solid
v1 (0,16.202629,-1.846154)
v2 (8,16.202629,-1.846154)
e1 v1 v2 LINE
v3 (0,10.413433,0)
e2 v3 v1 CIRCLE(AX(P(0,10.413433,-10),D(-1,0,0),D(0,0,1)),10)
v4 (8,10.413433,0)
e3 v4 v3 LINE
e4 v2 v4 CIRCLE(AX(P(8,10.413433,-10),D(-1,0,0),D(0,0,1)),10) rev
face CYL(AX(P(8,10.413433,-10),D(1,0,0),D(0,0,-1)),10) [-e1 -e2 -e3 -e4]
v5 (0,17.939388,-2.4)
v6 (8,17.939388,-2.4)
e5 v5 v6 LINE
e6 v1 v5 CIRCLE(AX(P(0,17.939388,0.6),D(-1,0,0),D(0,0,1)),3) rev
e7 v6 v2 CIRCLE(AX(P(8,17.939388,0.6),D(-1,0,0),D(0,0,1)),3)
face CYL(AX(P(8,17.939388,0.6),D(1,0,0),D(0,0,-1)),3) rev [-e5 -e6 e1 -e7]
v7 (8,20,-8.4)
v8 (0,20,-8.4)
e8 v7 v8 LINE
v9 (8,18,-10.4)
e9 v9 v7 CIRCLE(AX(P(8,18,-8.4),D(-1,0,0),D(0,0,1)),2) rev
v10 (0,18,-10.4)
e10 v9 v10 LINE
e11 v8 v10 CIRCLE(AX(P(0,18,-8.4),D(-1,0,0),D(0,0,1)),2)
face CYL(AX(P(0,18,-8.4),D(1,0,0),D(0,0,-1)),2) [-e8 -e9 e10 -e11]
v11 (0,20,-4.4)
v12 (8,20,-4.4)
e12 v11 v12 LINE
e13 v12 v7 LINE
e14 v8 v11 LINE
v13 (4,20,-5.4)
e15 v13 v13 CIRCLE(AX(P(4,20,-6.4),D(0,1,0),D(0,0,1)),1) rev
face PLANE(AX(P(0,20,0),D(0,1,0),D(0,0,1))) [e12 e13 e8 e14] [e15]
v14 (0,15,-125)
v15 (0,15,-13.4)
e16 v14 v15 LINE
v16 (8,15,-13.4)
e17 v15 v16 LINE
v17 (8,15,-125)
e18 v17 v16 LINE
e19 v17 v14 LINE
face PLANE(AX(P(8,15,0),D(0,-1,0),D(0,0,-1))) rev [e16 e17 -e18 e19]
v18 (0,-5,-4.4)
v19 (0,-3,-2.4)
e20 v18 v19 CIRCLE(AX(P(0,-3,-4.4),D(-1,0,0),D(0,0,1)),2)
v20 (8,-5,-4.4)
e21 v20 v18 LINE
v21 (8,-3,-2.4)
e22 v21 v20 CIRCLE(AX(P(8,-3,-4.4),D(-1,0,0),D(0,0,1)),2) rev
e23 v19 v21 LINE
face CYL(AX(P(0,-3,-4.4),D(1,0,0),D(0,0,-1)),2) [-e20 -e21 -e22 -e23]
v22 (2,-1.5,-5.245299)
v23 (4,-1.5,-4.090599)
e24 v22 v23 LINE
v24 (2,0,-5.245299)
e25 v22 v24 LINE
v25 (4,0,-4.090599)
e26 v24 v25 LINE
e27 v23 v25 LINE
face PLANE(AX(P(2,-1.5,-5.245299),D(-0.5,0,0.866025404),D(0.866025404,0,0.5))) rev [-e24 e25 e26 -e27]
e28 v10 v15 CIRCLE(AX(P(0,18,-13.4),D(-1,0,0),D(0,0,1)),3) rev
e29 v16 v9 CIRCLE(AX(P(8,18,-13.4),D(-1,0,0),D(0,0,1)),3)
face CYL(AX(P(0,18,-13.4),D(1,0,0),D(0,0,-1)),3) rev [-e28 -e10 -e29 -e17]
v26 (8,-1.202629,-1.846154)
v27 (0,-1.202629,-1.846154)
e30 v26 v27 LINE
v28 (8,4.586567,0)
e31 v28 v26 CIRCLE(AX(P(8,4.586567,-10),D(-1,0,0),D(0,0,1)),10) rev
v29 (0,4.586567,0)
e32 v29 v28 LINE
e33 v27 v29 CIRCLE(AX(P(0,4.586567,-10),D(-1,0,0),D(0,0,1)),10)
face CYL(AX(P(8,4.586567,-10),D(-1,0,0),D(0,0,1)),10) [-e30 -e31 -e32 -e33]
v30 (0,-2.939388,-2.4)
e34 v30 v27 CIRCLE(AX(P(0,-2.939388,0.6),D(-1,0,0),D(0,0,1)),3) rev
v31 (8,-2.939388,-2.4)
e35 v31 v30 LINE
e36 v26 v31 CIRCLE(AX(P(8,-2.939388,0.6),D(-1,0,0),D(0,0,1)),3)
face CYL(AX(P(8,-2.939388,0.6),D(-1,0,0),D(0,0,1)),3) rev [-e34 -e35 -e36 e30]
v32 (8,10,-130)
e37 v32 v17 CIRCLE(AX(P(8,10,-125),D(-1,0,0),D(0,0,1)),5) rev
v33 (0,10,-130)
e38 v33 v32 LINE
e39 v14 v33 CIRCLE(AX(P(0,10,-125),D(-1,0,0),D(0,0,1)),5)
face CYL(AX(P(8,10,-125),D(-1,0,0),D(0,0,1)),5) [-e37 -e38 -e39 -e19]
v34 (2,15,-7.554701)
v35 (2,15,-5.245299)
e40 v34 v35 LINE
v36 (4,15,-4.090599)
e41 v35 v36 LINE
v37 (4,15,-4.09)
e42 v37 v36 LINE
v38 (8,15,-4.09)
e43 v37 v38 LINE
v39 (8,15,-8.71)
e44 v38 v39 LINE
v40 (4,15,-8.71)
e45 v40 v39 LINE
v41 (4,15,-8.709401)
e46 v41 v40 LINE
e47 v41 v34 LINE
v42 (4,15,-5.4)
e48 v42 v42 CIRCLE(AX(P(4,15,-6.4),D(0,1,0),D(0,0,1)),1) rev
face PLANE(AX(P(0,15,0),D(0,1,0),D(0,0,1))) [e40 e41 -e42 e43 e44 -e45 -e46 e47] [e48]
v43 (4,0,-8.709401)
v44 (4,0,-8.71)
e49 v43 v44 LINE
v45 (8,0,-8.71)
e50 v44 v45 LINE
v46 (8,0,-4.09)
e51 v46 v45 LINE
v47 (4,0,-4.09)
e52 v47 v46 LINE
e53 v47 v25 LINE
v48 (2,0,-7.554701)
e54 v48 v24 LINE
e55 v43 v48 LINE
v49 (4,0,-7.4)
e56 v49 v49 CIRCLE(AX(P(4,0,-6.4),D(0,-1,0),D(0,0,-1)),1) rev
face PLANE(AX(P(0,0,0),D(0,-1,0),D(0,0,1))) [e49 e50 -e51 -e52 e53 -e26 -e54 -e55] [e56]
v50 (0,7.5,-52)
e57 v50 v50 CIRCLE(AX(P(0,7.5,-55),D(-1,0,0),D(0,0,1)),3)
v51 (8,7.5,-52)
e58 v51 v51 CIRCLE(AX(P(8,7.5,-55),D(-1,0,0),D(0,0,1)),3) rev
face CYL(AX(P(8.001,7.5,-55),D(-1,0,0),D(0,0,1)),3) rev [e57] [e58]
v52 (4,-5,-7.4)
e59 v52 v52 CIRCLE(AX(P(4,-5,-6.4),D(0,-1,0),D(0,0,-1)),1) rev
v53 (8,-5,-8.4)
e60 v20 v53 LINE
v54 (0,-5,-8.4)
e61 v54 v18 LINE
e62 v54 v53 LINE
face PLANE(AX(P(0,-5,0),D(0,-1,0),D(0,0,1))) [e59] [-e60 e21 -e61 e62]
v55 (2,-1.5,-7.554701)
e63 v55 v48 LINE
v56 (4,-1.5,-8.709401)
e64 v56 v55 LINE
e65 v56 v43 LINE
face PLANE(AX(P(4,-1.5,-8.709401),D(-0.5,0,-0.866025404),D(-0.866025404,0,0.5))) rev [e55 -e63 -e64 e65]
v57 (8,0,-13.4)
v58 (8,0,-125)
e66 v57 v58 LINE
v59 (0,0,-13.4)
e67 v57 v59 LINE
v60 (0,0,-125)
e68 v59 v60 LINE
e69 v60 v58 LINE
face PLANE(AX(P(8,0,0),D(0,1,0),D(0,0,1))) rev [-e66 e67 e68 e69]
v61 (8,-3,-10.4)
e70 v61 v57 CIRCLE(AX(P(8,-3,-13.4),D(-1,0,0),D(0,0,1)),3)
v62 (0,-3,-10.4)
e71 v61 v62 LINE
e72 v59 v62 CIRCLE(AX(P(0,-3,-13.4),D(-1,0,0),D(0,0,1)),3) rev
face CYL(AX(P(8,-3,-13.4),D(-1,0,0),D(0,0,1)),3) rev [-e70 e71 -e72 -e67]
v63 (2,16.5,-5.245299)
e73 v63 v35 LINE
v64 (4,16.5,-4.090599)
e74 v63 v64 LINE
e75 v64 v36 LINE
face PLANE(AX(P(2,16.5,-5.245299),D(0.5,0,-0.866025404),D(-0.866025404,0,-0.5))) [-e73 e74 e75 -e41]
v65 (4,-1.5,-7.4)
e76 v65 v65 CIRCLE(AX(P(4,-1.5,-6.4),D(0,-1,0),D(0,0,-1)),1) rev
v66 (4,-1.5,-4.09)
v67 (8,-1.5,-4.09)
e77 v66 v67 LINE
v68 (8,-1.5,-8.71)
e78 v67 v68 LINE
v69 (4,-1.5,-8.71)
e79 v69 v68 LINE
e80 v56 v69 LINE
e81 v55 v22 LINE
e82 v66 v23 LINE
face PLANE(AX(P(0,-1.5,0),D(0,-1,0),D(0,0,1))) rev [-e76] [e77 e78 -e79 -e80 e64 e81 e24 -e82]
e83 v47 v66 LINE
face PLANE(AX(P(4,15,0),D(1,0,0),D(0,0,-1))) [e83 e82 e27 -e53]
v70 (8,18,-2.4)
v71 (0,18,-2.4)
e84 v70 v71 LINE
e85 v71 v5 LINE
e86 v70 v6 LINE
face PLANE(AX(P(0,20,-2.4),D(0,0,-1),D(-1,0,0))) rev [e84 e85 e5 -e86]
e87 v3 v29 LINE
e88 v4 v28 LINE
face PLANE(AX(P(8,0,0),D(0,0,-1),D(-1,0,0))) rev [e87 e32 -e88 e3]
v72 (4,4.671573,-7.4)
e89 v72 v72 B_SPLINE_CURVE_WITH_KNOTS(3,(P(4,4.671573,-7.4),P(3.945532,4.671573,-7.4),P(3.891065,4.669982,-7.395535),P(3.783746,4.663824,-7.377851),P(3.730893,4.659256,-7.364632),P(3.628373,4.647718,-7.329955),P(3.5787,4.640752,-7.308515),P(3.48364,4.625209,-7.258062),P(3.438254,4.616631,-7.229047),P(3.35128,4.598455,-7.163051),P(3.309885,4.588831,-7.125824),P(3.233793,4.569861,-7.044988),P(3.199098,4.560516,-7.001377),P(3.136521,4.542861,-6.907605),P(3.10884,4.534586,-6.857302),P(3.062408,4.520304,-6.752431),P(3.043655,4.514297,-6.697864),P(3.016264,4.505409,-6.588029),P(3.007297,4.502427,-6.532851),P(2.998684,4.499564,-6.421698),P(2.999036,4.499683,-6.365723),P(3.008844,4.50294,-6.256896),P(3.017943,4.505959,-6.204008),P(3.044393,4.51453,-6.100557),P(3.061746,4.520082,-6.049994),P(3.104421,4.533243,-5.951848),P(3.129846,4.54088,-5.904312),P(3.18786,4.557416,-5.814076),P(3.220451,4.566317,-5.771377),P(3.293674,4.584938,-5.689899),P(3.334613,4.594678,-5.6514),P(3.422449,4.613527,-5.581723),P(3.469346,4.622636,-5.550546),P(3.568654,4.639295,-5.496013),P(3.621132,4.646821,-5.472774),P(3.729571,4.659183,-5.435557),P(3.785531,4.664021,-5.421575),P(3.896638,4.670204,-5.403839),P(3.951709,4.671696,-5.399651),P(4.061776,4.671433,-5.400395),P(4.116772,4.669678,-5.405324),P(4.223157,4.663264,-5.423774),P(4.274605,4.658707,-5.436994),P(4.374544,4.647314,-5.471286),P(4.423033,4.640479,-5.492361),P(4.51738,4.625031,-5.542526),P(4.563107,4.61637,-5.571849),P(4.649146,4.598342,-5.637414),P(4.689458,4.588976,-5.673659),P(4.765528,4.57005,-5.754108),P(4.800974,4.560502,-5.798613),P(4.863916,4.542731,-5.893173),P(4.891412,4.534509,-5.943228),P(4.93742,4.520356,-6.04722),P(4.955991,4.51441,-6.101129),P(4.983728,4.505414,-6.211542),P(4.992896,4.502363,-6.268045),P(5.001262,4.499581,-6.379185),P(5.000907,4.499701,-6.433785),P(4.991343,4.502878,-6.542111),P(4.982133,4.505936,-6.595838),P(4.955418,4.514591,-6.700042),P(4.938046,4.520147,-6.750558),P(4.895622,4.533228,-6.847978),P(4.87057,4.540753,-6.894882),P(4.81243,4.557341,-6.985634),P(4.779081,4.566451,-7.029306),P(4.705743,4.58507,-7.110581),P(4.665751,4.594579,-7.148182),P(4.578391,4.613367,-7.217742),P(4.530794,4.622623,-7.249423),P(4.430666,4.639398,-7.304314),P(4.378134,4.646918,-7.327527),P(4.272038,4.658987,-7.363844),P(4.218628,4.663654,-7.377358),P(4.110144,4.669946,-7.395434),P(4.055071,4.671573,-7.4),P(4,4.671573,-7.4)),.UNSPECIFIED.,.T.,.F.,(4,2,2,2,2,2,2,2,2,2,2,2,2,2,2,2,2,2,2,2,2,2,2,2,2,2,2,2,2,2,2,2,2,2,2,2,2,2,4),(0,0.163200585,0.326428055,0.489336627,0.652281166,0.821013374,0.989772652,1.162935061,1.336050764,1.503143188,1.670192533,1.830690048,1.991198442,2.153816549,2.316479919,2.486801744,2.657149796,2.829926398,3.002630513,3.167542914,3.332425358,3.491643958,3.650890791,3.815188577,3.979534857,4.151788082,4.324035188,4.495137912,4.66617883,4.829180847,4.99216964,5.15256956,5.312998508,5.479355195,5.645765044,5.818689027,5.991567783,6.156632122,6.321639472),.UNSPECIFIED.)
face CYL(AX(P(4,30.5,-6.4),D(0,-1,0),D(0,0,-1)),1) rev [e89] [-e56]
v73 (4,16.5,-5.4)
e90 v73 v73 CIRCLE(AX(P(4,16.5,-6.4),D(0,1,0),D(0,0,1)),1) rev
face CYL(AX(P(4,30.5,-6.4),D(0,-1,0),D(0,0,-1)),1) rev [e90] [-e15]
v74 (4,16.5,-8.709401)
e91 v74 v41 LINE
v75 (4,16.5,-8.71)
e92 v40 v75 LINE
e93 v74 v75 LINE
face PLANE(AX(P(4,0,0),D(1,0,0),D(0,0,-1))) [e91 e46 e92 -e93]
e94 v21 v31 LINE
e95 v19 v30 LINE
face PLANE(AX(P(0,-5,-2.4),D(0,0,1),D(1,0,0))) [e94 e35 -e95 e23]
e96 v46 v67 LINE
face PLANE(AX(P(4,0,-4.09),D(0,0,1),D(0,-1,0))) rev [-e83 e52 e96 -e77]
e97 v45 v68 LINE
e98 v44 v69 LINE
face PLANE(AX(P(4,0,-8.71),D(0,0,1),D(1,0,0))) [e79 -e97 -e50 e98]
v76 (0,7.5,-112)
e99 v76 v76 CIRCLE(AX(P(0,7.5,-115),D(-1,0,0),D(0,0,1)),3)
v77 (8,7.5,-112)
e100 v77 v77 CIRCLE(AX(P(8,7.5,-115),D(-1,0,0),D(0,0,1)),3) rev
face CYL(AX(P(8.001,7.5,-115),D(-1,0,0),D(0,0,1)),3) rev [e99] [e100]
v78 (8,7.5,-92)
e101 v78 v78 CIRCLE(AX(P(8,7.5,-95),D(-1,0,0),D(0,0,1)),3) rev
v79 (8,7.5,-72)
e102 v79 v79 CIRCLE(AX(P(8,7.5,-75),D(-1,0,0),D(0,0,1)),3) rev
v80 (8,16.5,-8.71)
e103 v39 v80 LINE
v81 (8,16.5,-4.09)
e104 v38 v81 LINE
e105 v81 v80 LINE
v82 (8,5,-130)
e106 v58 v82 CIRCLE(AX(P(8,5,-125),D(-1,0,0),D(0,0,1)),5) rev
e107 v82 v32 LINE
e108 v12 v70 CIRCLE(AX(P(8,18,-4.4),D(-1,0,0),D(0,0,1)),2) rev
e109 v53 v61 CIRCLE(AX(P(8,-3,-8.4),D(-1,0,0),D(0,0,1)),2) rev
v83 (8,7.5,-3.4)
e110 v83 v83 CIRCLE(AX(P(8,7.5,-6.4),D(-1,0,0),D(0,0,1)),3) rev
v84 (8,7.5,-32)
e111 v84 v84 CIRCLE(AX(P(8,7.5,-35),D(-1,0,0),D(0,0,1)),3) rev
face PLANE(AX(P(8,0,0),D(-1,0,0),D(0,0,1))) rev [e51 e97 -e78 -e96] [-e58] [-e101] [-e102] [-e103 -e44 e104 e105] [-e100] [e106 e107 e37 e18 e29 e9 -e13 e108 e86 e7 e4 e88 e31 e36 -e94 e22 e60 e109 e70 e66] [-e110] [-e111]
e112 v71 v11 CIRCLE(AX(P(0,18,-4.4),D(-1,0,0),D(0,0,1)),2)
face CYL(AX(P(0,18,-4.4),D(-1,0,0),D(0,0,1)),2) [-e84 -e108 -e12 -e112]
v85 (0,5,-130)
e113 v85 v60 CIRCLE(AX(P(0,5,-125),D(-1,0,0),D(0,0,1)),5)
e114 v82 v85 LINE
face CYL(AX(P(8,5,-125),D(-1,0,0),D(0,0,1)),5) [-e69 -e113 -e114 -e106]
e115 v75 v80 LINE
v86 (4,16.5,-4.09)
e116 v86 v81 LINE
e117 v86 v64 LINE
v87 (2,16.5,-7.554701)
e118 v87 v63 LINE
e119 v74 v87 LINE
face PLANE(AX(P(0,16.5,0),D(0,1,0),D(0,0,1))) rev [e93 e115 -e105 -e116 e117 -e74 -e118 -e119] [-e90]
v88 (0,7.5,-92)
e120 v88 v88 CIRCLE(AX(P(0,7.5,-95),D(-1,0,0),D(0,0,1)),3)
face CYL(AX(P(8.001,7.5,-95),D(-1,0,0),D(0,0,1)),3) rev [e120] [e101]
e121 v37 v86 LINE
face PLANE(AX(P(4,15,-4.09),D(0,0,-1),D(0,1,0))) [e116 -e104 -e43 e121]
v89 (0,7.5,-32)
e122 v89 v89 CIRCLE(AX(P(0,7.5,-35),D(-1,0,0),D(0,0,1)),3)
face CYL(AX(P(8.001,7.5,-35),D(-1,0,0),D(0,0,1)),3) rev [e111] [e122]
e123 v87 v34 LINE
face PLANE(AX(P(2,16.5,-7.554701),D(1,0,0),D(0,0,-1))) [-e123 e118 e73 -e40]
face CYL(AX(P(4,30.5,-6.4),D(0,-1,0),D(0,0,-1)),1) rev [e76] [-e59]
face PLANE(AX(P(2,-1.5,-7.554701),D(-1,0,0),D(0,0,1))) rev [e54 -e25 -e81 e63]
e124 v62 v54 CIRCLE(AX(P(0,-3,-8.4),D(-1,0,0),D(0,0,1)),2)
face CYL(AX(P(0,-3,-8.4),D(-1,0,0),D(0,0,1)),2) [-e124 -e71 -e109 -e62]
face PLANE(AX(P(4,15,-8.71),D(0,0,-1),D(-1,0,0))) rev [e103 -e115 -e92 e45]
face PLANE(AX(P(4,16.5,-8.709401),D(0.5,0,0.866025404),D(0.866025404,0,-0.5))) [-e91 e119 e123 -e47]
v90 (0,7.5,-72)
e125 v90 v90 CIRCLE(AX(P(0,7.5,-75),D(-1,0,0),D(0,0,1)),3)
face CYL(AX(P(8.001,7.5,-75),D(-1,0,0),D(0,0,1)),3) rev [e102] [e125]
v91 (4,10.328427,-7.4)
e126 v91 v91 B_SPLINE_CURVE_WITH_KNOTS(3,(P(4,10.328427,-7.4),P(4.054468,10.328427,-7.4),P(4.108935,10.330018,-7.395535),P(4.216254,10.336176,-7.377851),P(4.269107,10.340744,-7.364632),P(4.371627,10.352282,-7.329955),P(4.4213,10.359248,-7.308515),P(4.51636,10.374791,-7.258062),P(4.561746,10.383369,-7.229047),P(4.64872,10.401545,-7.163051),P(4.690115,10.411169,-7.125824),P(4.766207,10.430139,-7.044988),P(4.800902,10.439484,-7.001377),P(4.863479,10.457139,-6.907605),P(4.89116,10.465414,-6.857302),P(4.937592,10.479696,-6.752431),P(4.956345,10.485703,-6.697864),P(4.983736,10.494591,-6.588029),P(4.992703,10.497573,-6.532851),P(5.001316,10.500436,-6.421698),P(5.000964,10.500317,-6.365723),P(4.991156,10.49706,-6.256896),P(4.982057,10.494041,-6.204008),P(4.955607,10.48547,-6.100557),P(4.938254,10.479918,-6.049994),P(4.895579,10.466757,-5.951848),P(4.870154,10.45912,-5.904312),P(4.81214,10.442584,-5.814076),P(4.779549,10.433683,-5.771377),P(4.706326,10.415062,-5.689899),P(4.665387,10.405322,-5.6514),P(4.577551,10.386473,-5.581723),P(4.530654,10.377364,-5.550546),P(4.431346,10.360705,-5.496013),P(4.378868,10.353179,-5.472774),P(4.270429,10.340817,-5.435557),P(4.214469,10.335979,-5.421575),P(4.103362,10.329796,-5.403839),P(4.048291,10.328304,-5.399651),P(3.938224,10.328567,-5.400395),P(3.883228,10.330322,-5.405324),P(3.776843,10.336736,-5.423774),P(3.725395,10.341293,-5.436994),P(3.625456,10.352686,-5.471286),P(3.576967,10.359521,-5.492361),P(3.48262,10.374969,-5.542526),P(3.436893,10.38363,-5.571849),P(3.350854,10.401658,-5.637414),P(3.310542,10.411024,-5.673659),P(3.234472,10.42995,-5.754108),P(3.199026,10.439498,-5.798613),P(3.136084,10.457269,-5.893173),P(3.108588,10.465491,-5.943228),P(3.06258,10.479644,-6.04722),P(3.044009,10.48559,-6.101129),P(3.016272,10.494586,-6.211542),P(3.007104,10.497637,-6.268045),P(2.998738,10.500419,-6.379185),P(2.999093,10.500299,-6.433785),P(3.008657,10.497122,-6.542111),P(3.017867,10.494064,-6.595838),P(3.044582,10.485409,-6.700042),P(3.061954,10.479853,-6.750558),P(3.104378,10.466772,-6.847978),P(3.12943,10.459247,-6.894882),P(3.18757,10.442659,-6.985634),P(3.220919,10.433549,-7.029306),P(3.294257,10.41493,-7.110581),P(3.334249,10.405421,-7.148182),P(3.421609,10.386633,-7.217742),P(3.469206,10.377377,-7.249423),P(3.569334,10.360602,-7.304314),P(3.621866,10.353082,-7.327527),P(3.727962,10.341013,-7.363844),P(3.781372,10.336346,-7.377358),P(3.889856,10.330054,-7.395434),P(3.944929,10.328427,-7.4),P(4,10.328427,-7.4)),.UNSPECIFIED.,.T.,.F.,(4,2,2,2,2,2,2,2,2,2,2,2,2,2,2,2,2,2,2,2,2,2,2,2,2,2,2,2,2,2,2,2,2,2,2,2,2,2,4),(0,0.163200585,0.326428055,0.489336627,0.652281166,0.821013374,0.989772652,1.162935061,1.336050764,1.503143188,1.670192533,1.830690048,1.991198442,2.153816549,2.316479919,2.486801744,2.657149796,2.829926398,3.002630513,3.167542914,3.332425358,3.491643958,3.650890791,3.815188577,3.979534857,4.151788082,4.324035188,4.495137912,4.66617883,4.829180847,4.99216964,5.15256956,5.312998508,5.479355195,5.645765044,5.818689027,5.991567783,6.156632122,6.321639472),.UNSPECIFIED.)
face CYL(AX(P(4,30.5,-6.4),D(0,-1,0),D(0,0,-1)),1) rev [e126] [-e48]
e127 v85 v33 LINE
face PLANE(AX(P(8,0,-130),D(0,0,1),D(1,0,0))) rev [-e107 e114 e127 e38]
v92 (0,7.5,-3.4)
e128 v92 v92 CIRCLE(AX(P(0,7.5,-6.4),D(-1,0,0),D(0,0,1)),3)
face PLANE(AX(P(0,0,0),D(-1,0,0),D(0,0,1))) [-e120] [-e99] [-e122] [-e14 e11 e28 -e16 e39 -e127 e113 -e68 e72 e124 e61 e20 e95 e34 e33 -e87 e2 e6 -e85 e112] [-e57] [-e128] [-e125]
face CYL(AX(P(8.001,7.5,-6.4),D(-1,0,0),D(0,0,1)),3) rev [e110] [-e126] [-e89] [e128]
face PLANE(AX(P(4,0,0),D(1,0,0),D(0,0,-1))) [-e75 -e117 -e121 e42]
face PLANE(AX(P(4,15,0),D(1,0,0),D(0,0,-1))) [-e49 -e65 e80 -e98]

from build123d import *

# Parameters (mm, degrees)
SKETCH_1_W                = 130
SKETCH_1_H                = 15
EXTRUDE_1_DEPTH           = 8
CUT_EXTRUDE_10_REACH      = 133.107
SKETCH_17_R               = 3
CUT_EXTRUDE_12_REACH      = 133.107
SKETCH_15_R               = 3
SKETCH_22_W               = 8
SKETCH_22_H               = 8
EXTRUDE_7_DEPTH           = 5
CUT_EXTRUDE_18_DEPTH      = 1.5
SKETCH_25_W               = 4.62
SKETCH_25_H               = 1.5
CUT_EXTRUDE_19_DEPTH      = 4
FILLET_8_R                = 3
FILLET_9_R                = 2
FILLET_10_R               = 2
FILLET_11_R               = 3
CUT_EXTRUDE_20_DEPTH      = 15.5
CUT_EXTRUDE_20_DEPTH_BACK = 28.5
SKETCH_21_R               = 1
FILLET_12_R               = 10
FILLET_13_R               = 5


# Some blends are built 0.0001 mm under size
with BuildPart() as part:
    # 草图1 → 凸台-拉伸1 (new body)
    with BuildSketch(Plane(origin=(0, 0, 0), x_dir=(0, 0, -1), z_dir=(1, 0, 0))):
        with Locations((65, 7.5)):
            Rectangle(SKETCH_1_W, SKETCH_1_H)
    extrude(amount=EXTRUDE_1_DEPTH)

    # 草图17 → 切除-拉伸10 (cut, up to next)
    with BuildSketch(Plane.ZY, mode=Mode.PRIVATE) as cut_extrude_10_sk1:
        with Locations((-115, 7.5)):
            Circle(SKETCH_17_R)
    cut_extrude_10_tool1 = extrude(cut_extrude_10_sk1.sketch, amount=-CUT_EXTRUDE_10_REACH, mode=Mode.PRIVATE) & part.part
    # 草图17 → 切除-拉伸10 (cut, up to next)
    with BuildSketch(Plane.ZY, mode=Mode.PRIVATE) as cut_extrude_10_sk2:
        with Locations((-95, 7.5)):
            Circle(SKETCH_17_R)
    cut_extrude_10_tool2 = extrude(cut_extrude_10_sk2.sketch, amount=-CUT_EXTRUDE_10_REACH, mode=Mode.PRIVATE) & part.part
    # 草图17 → 切除-拉伸10 (cut, up to next)
    with BuildSketch(Plane.ZY, mode=Mode.PRIVATE) as cut_extrude_10_sk3:
        with Locations((-75, 7.5)):
            Circle(SKETCH_17_R)
    cut_extrude_10_tool3 = extrude(cut_extrude_10_sk3.sketch, amount=-CUT_EXTRUDE_10_REACH, mode=Mode.PRIVATE) & part.part
    # 草图17 → 切除-拉伸10 (cut, up to next)
    with BuildSketch(Plane.ZY, mode=Mode.PRIVATE) as cut_extrude_10_sk4:
        with Locations((-55, 7.5)):
            Circle(SKETCH_17_R)
    cut_extrude_10_tool4 = extrude(cut_extrude_10_sk4.sketch, amount=-CUT_EXTRUDE_10_REACH, mode=Mode.PRIVATE) & part.part
    # 草图17 → 切除-拉伸10 (cut, up to next)
    with BuildSketch(Plane.ZY, mode=Mode.PRIVATE) as cut_extrude_10_sk5:
        with Locations((-35, 7.5)):
            Circle(SKETCH_17_R)
    cut_extrude_10_tool5 = extrude(cut_extrude_10_sk5.sketch, amount=-CUT_EXTRUDE_10_REACH, mode=Mode.PRIVATE) & part.part
    add(cut_extrude_10_tool1.solids().sort_by_distance((0, 7.5, -115))[0], mode=Mode.SUBTRACT)
    add(cut_extrude_10_tool2.solids().sort_by_distance((0, 7.5, -95))[0], mode=Mode.SUBTRACT)
    add(cut_extrude_10_tool3.solids().sort_by_distance((0, 7.5, -75))[0], mode=Mode.SUBTRACT)
    add(cut_extrude_10_tool4.solids().sort_by_distance((0, 7.5, -55))[0], mode=Mode.SUBTRACT)
    add(cut_extrude_10_tool5.solids().sort_by_distance((0, 7.5, -35))[0], mode=Mode.SUBTRACT)

    # 草图15 → 切除-拉伸12 (cut, up to next)
    with BuildSketch(Plane.ZY, mode=Mode.PRIVATE) as cut_extrude_12_sk1:
        with Locations((-6.4, 7.5)):
            Circle(SKETCH_15_R)
    cut_extrude_12_tool1 = extrude(cut_extrude_12_sk1.sketch, amount=-CUT_EXTRUDE_12_REACH, mode=Mode.PRIVATE) & part.part
    add(cut_extrude_12_tool1.solids().sort_by_distance((0, 7.5, -6.4))[0], mode=Mode.SUBTRACT)

    # 草图22 → 凸台-拉伸7 (add)
    with BuildSketch(Plane(origin=(0, 15, 0), x_dir=(1, 0, 0), z_dir=(0, 1, 0))):
        with Locations((4, 6.4)):
            Rectangle(SKETCH_22_W, SKETCH_22_H)
    extrude_7 = extrude(amount=EXTRUDE_7_DEPTH)

    # 草图24 → 切除-拉伸18 (cut)
    with BuildSketch(Plane(origin=(0, 15, 0), x_dir=(1, 0, 0), z_dir=(0, 1, 0))):
        Polygon((4, 4.090598923), (6, 5.245299462), (6, 7.554700538), (4, 8.709401077), (2, 7.554700538), (2, 5.245299462), align=None)
    cut_extrude_18 = extrude(amount=CUT_EXTRUDE_18_DEPTH, mode=Mode.SUBTRACT)

    # 草图25 → 切除-拉伸19 (cut)
    with BuildSketch(Plane(origin=(8, 0, 0), x_dir=(0, 0, -1), z_dir=(1, 0, 0))):
        with Locations((6.4, 15.75)):
            Rectangle(SKETCH_25_W, SKETCH_25_H)
    cut_extrude_19 = extrude(amount=-CUT_EXTRUDE_19_DEPTH, mode=Mode.SUBTRACT)

    # 圆角8
    # the kernel refuses this fillet: 3 mm, written as the material it adds along each edge
    with BuildSketch(Plane(origin=(8, 15, -2.4), x_dir=(0, 1.5846583304811187e-12, 1.0), z_dir=(-1, 0, 0))) as fillet_8_piece_1:
        with BuildLine():
            CenterArc((3, 2.939387691), FILLET_8_R, 180, 78.463040967)
            Line((0, 2.939387691), (-0.06, 2.939387691))
            Line((-0.06, 2.939387691), (-0.06, 0))
            Line((-0.06, 0), (0, -0.06))
            ThreePointArc((0, -0.06), (1.2, -0.06), (2.388, -0.058787754))
            Line((2.388, -0.058787754), (2.4, 0))
        make_face()
    extrude(amount=8)
    with BuildSketch(Plane(origin=(0, 15, -10.4), x_dir=(0, 0, -1), z_dir=(1, 0, 0))) as fillet_8_piece_2:
        with BuildLine():
            CenterArc((FILLET_8_R, FILLET_8_R), FILLET_8_R, 180, 90)
            Line((0, FILLET_8_R), (-FILLET_8_R * 0.02, FILLET_8_R))
            Line((-FILLET_8_R * 0.02, FILLET_8_R), (-FILLET_8_R * 0.02, -FILLET_8_R * 0.02))
            Line((-FILLET_8_R * 0.02, -FILLET_8_R * 0.02), (FILLET_8_R, -FILLET_8_R * 0.02))
            Line((FILLET_8_R, -FILLET_8_R * 0.02), (FILLET_8_R, 0))
        make_face()
    extrude(amount=8)

    # 圆角9
    fillet_9_edges = [part.edges().sort_by_distance(p)[0] for p in [
        (4, 20, -2.4),
        (4, 20, -10.4),
    ]]
    fillet(fillet_9_edges, radius=FILLET_9_R - 0.0001)  # a hair under: the kernel refuses the full size

    # 镜向6: 凸台-拉伸7, 切除-拉伸18, 切除-拉伸19 across plane
    add(extrude_7.mirror(Plane.ZX.offset(7.5)))
    add(cut_extrude_18.mirror(Plane.ZX.offset(7.5)), mode=Mode.SUBTRACT)
    add(cut_extrude_19.mirror(Plane.ZX.offset(7.5)), mode=Mode.SUBTRACT)

    # 圆角10
    fillet_10_edges = [part.edges().sort_by_distance(p)[0] for p in [
        (4, -5, -10.4),
        (4, -5, -2.4),
    ]]
    fillet(fillet_10_edges, radius=FILLET_10_R)

    # 圆角11
    # the kernel refuses this fillet: 3 mm, written as the material it adds along each edge
    with BuildSketch(Plane(origin=(8, 0, -2.4), x_dir=(0, -1, 0), z_dir=(-1, 0, 0))) as fillet_11_piece_1:
        with BuildLine():
            CenterArc((2.939387691, 3), FILLET_11_R, 191.536959033, 78.463040967)
            Line((0, 2.4), (-0.058787754, 2.388))
            ThreePointArc((-0.058787754, 2.388), (-0.06, 1.2), (-0.06, 0))
            Line((-0.06, 0), (0, -0.06))
            Line((0, -0.06), (2.939387691, -0.06))
            Line((2.939387691, -0.06), (2.939387691, 0))
        make_face()
    extrude(amount=8)
    with BuildSketch(Plane(origin=(0, 0, -10.4), x_dir=(0, -1, 0), z_dir=(1, 0, 0))) as fillet_11_piece_2:
        with BuildLine():
            CenterArc((FILLET_11_R, FILLET_11_R), FILLET_11_R, 180, 90)
            Line((0, FILLET_11_R), (-FILLET_11_R * 0.02, FILLET_11_R))
            Line((-FILLET_11_R * 0.02, FILLET_11_R), (-FILLET_11_R * 0.02, -FILLET_11_R * 0.02))
            Line((-FILLET_11_R * 0.02, -FILLET_11_R * 0.02), (FILLET_11_R, -FILLET_11_R * 0.02))
            Line((FILLET_11_R, -FILLET_11_R * 0.02), (FILLET_11_R, 0))
        make_face()
    extrude(amount=8)

    # 草图21 → 切除-拉伸20 (cut, two sides: drawn at the far end of the back side and taken through both)
    with BuildSketch(Plane(origin=(0, 15, 0), x_dir=(1, 0, 0), z_dir=(0, 1, 0)).offset(-CUT_EXTRUDE_20_DEPTH_BACK)):
        with Locations(Location((4, 6.4, 0), (0, 0, 90))):
            Circle(SKETCH_21_R)
    extrude(amount=CUT_EXTRUDE_20_DEPTH + CUT_EXTRUDE_20_DEPTH_BACK, mode=Mode.SUBTRACT)

    # 圆角12
    fillet_12_edges = [part.edges().sort_by_distance(p)[0] for p in [
        (4, 15, 0),
        (4, 0, 0),
    ]]
    fillet(fillet_12_edges, radius=FILLET_12_R)

    # 圆角13
    fillet_13_edges = [part.edges().sort_by_distance(p)[0] for p in [
        (4, 15, -130),
        (4, 0, -130),
    ]]
    fillet(fillet_13_edges, radius=FILLET_13_R)


solid = part.part
